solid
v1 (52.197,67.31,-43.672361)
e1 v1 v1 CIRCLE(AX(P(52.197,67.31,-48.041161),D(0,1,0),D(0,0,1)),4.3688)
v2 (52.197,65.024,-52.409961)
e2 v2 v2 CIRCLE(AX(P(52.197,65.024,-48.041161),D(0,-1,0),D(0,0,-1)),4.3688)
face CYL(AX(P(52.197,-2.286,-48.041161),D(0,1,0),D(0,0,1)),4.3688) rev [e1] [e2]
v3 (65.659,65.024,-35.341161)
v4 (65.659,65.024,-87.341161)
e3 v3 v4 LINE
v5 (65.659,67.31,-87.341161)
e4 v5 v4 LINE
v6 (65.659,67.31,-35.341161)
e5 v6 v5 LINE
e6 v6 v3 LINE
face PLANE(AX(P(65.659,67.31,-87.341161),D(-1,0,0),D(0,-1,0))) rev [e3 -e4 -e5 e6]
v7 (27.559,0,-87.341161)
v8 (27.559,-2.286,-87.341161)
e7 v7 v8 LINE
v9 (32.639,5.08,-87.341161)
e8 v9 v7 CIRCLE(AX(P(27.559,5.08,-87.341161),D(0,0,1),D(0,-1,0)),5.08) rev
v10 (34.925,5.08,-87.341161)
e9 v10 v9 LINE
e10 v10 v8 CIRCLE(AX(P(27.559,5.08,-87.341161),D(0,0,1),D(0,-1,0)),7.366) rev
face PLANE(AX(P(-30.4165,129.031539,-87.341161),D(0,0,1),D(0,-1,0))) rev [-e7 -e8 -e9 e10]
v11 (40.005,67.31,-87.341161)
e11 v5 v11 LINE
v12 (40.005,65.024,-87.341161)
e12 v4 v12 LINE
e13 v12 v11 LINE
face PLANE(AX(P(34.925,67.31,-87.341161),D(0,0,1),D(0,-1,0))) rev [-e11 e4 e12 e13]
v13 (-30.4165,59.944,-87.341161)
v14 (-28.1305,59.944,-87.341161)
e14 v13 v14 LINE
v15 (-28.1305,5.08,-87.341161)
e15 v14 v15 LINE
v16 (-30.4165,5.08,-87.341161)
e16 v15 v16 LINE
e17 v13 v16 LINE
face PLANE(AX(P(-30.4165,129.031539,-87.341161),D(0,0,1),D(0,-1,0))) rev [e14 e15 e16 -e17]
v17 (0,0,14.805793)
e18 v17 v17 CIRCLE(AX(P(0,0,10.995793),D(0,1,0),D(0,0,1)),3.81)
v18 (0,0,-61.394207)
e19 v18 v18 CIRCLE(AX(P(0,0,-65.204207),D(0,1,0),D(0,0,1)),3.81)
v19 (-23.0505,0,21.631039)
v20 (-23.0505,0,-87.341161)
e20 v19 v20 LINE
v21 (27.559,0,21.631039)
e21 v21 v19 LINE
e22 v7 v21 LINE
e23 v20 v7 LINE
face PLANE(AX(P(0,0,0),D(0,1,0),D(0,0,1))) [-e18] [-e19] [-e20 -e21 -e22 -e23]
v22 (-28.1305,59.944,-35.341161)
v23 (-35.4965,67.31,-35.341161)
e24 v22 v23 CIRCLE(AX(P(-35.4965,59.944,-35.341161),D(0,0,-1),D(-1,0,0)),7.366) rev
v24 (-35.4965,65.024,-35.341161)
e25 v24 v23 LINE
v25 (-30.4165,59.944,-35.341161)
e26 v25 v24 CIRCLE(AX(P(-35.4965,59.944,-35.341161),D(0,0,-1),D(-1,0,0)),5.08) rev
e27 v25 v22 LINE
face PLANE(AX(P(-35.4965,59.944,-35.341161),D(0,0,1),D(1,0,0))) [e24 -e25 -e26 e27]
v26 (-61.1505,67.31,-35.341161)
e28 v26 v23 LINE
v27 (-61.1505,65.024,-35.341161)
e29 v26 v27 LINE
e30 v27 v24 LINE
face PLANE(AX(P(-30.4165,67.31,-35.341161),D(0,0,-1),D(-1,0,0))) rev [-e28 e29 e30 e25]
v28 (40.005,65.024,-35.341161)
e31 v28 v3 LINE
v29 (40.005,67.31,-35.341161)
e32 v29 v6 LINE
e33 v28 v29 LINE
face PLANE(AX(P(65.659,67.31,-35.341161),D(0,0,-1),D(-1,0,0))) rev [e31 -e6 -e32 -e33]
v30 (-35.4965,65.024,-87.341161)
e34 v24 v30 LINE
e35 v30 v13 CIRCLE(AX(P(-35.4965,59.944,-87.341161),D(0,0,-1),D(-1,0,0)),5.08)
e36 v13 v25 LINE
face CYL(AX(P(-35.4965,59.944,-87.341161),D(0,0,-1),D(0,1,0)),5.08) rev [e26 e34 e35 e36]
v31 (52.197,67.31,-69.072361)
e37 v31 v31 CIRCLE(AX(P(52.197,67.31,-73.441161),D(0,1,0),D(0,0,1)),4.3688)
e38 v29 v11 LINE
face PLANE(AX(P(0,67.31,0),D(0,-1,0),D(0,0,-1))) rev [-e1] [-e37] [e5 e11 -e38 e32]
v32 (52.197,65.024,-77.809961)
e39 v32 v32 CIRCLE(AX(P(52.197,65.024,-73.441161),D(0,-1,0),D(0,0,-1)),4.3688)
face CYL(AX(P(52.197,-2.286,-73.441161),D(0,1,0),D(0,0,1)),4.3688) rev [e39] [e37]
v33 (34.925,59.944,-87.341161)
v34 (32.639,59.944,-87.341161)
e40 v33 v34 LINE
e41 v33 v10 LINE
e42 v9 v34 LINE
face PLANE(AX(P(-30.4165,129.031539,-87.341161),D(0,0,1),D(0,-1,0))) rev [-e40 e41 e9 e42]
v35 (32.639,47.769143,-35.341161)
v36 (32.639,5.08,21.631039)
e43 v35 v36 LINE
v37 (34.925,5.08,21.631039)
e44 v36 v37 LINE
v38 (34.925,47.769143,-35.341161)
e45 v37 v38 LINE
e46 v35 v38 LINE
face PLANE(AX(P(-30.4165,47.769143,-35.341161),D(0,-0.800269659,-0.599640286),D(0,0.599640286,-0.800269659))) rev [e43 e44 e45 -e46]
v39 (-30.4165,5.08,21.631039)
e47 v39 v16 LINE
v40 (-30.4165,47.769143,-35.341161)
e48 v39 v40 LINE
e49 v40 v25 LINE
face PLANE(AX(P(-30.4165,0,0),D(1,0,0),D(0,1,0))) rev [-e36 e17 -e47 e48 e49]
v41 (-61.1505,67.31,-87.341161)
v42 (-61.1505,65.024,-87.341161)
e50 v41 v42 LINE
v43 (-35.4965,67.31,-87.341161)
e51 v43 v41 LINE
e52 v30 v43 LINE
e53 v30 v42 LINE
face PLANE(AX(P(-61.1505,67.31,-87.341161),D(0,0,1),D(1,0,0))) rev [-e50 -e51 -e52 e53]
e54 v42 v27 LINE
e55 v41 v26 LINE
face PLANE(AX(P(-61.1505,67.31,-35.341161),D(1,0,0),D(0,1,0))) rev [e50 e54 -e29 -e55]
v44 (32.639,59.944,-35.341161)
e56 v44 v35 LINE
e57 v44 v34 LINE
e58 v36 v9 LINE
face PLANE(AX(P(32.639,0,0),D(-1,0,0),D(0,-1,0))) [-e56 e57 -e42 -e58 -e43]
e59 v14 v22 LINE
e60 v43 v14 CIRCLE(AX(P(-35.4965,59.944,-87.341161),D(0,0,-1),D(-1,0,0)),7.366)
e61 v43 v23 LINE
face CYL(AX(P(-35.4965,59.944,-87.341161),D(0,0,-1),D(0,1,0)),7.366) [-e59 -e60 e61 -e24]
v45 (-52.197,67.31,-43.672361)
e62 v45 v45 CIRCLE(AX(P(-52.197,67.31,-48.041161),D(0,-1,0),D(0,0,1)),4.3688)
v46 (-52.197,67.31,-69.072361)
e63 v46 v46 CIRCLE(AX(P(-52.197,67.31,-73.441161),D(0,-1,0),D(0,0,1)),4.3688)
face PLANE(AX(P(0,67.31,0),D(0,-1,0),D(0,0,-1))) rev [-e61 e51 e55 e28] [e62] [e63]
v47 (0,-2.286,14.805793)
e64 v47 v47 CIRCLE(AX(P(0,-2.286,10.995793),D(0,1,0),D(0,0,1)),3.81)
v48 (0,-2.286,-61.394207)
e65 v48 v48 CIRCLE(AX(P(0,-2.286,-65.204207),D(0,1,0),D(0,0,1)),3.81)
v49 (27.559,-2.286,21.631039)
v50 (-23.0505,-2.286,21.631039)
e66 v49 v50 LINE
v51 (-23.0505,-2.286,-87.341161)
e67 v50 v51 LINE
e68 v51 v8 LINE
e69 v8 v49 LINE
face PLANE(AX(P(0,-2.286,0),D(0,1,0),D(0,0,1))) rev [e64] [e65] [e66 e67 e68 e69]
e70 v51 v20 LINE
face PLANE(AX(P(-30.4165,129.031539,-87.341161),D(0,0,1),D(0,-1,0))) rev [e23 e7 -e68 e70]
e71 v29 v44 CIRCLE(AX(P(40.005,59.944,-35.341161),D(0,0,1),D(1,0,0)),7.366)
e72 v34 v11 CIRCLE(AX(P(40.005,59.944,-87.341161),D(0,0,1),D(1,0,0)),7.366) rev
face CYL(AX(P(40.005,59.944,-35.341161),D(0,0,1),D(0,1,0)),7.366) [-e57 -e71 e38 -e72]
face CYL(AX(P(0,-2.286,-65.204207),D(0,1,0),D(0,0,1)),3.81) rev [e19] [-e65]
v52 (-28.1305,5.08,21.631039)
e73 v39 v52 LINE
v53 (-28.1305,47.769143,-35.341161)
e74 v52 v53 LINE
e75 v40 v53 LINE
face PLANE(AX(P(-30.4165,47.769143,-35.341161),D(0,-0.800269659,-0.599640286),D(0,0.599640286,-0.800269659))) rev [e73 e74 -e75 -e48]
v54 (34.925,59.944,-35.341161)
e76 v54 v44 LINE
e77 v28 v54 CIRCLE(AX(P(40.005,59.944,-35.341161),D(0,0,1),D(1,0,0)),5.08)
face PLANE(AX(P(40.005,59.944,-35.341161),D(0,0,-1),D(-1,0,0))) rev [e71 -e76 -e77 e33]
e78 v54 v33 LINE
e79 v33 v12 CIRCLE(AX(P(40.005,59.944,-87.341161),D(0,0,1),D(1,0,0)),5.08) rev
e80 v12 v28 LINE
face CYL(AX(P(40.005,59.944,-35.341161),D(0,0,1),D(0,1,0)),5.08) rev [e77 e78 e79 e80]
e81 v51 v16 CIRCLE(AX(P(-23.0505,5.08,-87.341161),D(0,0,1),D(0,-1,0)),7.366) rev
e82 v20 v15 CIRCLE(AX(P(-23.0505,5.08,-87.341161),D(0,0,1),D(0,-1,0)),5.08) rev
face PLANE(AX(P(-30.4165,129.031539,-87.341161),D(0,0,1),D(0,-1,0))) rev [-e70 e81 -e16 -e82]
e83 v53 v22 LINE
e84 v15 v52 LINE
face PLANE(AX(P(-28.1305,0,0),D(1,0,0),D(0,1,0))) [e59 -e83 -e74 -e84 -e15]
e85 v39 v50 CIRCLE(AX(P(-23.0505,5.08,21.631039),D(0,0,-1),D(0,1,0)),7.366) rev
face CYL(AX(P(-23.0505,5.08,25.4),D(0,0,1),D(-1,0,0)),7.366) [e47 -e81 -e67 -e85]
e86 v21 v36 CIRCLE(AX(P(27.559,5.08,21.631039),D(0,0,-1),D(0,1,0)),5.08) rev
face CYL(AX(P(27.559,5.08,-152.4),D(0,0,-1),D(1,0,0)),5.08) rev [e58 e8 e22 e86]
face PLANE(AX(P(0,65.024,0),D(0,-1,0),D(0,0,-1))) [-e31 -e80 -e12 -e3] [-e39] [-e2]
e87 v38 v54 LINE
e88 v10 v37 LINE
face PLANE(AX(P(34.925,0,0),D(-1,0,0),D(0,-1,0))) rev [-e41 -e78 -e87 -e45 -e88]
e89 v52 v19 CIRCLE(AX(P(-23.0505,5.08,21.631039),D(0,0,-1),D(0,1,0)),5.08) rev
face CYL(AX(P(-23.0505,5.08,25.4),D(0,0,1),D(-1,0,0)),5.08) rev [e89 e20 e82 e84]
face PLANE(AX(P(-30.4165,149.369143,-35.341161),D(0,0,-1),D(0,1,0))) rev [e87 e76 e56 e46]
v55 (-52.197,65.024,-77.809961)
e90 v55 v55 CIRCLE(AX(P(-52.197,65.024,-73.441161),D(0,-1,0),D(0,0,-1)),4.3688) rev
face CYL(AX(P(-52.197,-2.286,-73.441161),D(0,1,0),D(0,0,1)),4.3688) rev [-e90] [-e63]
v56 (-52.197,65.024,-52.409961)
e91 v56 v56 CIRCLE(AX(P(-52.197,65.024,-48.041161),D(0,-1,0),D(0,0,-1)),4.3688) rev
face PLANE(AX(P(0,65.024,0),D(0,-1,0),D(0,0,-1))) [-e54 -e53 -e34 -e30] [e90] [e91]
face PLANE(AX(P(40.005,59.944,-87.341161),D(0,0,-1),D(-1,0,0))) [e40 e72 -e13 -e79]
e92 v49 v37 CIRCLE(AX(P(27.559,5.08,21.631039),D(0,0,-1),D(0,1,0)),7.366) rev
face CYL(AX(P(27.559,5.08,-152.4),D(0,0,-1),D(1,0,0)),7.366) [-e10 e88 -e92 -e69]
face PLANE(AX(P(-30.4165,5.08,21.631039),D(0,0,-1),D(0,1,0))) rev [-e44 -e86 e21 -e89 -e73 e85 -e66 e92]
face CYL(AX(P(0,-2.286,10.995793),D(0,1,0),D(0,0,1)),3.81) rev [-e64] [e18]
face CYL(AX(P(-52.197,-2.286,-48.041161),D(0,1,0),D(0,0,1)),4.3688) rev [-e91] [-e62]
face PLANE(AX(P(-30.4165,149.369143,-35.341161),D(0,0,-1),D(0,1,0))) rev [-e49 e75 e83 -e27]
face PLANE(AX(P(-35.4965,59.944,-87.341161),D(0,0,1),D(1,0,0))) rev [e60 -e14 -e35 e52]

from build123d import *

# Parameters (mm, degrees)
SKETCH2_W                      = 65.3415
SKETCH2_H                      = 177.8
BASE_FLANGE1_DEPTH             = 2.286
EDGE_FLANGE1_STRIP_W           = 19.304
EDGE_FLANGE1_STRIP_H           = 2.286
EDGE_FLANGE1_STRIP_CUT_DEPTH   = 177.8
EDGE_FLANGE1_STRIP_2_W         = 19.304
EDGE_FLANGE1_STRIP_2_H         = 2.286
EDGE_FLANGE1_STRIP_CUT_2_DEPTH = 177.8
EDGE_FLANGE1_DEPTH             = 177.8
EDGE_FLANGE1_BEND_DEPTH        = 177.8
CUT_EXTRUDE1_DEPTH             = 171.223828311
CUT_EXTRUDE1_DEPTH_BACK        = 171.223828311
CUT_EXTRUDE2_DEPTH             = 171.223828311
CUT_EXTRUDE2_DEPTH_BACK        = 171.223828311
SKETCH20_W                     = 141.560534952
SKETCH20_H                     = 182.926434851
EDGE_FLANGE3_STRIP_W           = 19.304
EDGE_FLANGE3_STRIP_H           = 2.286
EDGE_FLANGE3_STRIP_CUT_DEPTH   = 52
EDGE_FLANGE3_STRIP_2_W         = 19.304
EDGE_FLANGE3_STRIP_2_H         = 2.286
EDGE_FLANGE3_STRIP_CUT_2_DEPTH = 52
EDGE_FLANGE3_DEPTH             = 52
EDGE_FLANGE3_BEND_DEPTH        = 52
SKETCH30_R                     = 3.81
CUT_EXTRUDE3_DEPTH             = 129.336350021
SKETCH31_R                     = 4.3688
CUT_EXTRUDE4_DEPTH             = 129.336350021


# Sheet-metal steps are written as plain solids
with BuildPart() as part:
    # Sketch2 → Base-Flange1 (new body)
    with BuildSketch(Plane(origin=(0, 0, 0), x_dir=(1, 0, 0), z_dir=(0, 1, 0))):
        with Locations((2.25425, 63.5)):
            Rectangle(SKETCH2_W, SKETCH2_H)
    extrude(amount=-BASE_FLANGE1_DEPTH)

    # Edge-Flange1 strip (across the edge) → Edge-Flange1 strip cut (cut)
    with BuildSketch(Plane(origin=(-30.4165, 0, -152.4), x_dir=(1, 0, 0), z_dir=(0, 0, 1))):
        with Locations((-2.286, -1.143)):
            Rectangle(EDGE_FLANGE1_STRIP_W, EDGE_FLANGE1_STRIP_H)
    extrude(amount=EDGE_FLANGE1_STRIP_CUT_DEPTH, mode=Mode.SUBTRACT)

    # Edge-Flange1 strip 2 (across the edge) → Edge-Flange1 strip cut 2 (cut)
    with BuildSketch(Plane(origin=(34.925, 0, 25.4), x_dir=(-1, 0, 0), z_dir=(0, 0, -1))):
        with Locations((-2.286, -1.143)):
            Rectangle(EDGE_FLANGE1_STRIP_2_W, EDGE_FLANGE1_STRIP_2_H)
    extrude(amount=EDGE_FLANGE1_STRIP_CUT_2_DEPTH, mode=Mode.SUBTRACT)

    # Edge-Flange1 section (across the edge) → Edge-Flange1 (add)
    with BuildSketch(Plane(origin=(-30.4165, 0, -152.4), x_dir=(1, 0, 0), z_dir=(0, 0, 1))):
        with BuildLine():
            Line((0, 5.08), (0, 67.31))
            Line((0, 67.31), (2.286, 67.31))
            Line((2.286, 67.31), (2.286, 5.08))
            ThreePointArc((2.286, 5.08), (3.773897552, 1.487897552), (7.366, 0))
            Line((7.366, 0), (7.366, -2.286))
            ThreePointArc((7.366, -2.286), (2.15745145, -0.12854855), (0, 5.08))
        make_face()
    extrude(amount=EDGE_FLANGE1_DEPTH)

    # Edge-Flange1 section 2 (across the edge) → Edge-Flange1 bend (add)
    with BuildSketch(Plane(origin=(34.925, 0, 25.4), x_dir=(-1, 0, 0), z_dir=(0, 0, -1))):
        with BuildLine():
            Line((0, 5.08), (0, 67.31))
            Line((0, 67.31), (2.286, 67.31))
            Line((2.286, 67.31), (2.286, 5.08))
            ThreePointArc((2.286, 5.08), (3.773897552, 1.487897552), (7.366, 0))
            Line((7.366, 0), (7.366, -2.286))
            ThreePointArc((7.366, -2.286), (2.15745145, -0.12854855), (0, 5.08))
        make_face()
    extrude(amount=EDGE_FLANGE1_BEND_DEPTH)

    # Sketch19 → Cut-Extrude1 (cut, two sides: drawn at the far end of the back side and taken through both)
    with BuildSketch(Plane(origin=(0, 0, 0), x_dir=(0, 0, -1), z_dir=(1, 0, 0)).offset(-CUT_EXTRUDE1_DEPTH_BACK)):
        Polygon((-21.631039281, 5.08), (-21.631039281, -27.285513127), (-49.571039281, -27.285513127), (-49.571039281, 149.369143464), (35.341160719, 149.369143464), (35.341160719, 47.769143464), align=None)
    extrude(amount=CUT_EXTRUDE1_DEPTH + CUT_EXTRUDE1_DEPTH_BACK, mode=Mode.SUBTRACT)

    # Sketch20 → Cut-Extrude2 (cut, two sides: drawn at the far end of the back side and taken through both)
    with BuildSketch(Plane(origin=(0, 0, 0), x_dir=(0, 0, -1), z_dir=(1, 0, 0)).offset(-CUT_EXTRUDE2_DEPTH_BACK)):
        with Locations((158.121428195, 37.56832172)):
            Rectangle(SKETCH20_W, SKETCH20_H)
    extrude(amount=CUT_EXTRUDE2_DEPTH + CUT_EXTRUDE2_DEPTH_BACK, mode=Mode.SUBTRACT)

    # Edge-Flange3 strip (across the edge) → Edge-Flange3 strip cut (cut)
    with BuildSketch(Plane(origin=(-30.4165, 67.31, -35.341160719), x_dir=(0, -1, 0), z_dir=(0, 0, -1))):
        with Locations((-2.286, -1.143)):
            Rectangle(EDGE_FLANGE3_STRIP_W, EDGE_FLANGE3_STRIP_H)
    extrude(amount=EDGE_FLANGE3_STRIP_CUT_DEPTH, mode=Mode.SUBTRACT)

    # Edge-Flange3 strip 2 (across the edge) → Edge-Flange3 strip cut 2 (cut)
    with BuildSketch(Plane(origin=(34.925, 67.31, -87.341160719), x_dir=(0, -1, 0), z_dir=(0, 0, 1))):
        with Locations((-2.286, -1.143)):
            Rectangle(EDGE_FLANGE3_STRIP_2_W, EDGE_FLANGE3_STRIP_2_H)
    extrude(amount=EDGE_FLANGE3_STRIP_CUT_2_DEPTH, mode=Mode.SUBTRACT)

    # Edge-Flange3 section (across the edge) → Edge-Flange3 (add)
    with BuildSketch(Plane(origin=(-30.4165, 67.31, -35.341160719), x_dir=(0, -1, 0), z_dir=(0, 0, -1))):
        with BuildLine():
            Line((0, 5.08), (0, 30.734))
            Line((0, 30.734), (2.286, 30.734))
            Line((2.286, 30.734), (2.286, 5.08))
            ThreePointArc((2.286, 5.08), (3.773897552, 1.487897552), (7.366, 0))
            Line((7.366, 0), (7.366, -2.286))
            ThreePointArc((7.366, -2.286), (2.15745145, -0.12854855), (0, 5.08))
        make_face()
    extrude(amount=EDGE_FLANGE3_DEPTH)

    # Edge-Flange3 section 2 (across the edge) → Edge-Flange3 bend (add)
    with BuildSketch(Plane(origin=(34.925, 67.31, -87.341160719), x_dir=(0, -1, 0), z_dir=(0, 0, 1))):
        with BuildLine():
            Line((0, 5.08), (0, 30.734))
            Line((0, 30.734), (2.286, 30.734))
            Line((2.286, 30.734), (2.286, 5.08))
            ThreePointArc((2.286, 5.08), (3.773897552, 1.487897552), (7.366, 0))
            Line((7.366, 0), (7.366, -2.286))
            ThreePointArc((7.366, -2.286), (2.15745145, -0.12854855), (0, 5.08))
        make_face()
    extrude(amount=EDGE_FLANGE3_BEND_DEPTH)

    # Sketch30 → Cut-Extrude3 (cut, through all)
    with BuildSketch(Plane(origin=(0, 0, 0), x_dir=(1, 0, 0), z_dir=(0, 1, 0))):
        with Locations(Location((0, -10.995792601, 0), (0, 0, 270))):
            Circle(SKETCH30_R)
        with Locations(Location((0, 65.204207399, 0), (0, 0, 270))):
            Circle(SKETCH30_R)
    extrude(amount=-CUT_EXTRUDE3_DEPTH, mode=Mode.SUBTRACT)

    # Sketch31 → Cut-Extrude4 (cut, symmetric)
    with BuildSketch(Plane(origin=(0, 0, 0), x_dir=(1, 0, 0), z_dir=(0, 1, 0))):
        with Locations(Location((52.197, 73.441160719, 0), (0, 0, 270))):
            Circle(SKETCH31_R)
        with Locations(Location((52.197, 48.041160719, 0), (0, 0, 270))):
            Circle(SKETCH31_R)
    cut_extrude4 = extrude(amount=CUT_EXTRUDE4_DEPTH, both=True, mode=Mode.SUBTRACT)

    # Mirror1: Cut-Extrude4 across plane
    add(cut_extrude4.mirror(Plane(origin=(0, 0, 0), x_dir=(0, 0, 1), z_dir=(1, 0, 0))), mode=Mode.SUBTRACT)


solid = part.part
